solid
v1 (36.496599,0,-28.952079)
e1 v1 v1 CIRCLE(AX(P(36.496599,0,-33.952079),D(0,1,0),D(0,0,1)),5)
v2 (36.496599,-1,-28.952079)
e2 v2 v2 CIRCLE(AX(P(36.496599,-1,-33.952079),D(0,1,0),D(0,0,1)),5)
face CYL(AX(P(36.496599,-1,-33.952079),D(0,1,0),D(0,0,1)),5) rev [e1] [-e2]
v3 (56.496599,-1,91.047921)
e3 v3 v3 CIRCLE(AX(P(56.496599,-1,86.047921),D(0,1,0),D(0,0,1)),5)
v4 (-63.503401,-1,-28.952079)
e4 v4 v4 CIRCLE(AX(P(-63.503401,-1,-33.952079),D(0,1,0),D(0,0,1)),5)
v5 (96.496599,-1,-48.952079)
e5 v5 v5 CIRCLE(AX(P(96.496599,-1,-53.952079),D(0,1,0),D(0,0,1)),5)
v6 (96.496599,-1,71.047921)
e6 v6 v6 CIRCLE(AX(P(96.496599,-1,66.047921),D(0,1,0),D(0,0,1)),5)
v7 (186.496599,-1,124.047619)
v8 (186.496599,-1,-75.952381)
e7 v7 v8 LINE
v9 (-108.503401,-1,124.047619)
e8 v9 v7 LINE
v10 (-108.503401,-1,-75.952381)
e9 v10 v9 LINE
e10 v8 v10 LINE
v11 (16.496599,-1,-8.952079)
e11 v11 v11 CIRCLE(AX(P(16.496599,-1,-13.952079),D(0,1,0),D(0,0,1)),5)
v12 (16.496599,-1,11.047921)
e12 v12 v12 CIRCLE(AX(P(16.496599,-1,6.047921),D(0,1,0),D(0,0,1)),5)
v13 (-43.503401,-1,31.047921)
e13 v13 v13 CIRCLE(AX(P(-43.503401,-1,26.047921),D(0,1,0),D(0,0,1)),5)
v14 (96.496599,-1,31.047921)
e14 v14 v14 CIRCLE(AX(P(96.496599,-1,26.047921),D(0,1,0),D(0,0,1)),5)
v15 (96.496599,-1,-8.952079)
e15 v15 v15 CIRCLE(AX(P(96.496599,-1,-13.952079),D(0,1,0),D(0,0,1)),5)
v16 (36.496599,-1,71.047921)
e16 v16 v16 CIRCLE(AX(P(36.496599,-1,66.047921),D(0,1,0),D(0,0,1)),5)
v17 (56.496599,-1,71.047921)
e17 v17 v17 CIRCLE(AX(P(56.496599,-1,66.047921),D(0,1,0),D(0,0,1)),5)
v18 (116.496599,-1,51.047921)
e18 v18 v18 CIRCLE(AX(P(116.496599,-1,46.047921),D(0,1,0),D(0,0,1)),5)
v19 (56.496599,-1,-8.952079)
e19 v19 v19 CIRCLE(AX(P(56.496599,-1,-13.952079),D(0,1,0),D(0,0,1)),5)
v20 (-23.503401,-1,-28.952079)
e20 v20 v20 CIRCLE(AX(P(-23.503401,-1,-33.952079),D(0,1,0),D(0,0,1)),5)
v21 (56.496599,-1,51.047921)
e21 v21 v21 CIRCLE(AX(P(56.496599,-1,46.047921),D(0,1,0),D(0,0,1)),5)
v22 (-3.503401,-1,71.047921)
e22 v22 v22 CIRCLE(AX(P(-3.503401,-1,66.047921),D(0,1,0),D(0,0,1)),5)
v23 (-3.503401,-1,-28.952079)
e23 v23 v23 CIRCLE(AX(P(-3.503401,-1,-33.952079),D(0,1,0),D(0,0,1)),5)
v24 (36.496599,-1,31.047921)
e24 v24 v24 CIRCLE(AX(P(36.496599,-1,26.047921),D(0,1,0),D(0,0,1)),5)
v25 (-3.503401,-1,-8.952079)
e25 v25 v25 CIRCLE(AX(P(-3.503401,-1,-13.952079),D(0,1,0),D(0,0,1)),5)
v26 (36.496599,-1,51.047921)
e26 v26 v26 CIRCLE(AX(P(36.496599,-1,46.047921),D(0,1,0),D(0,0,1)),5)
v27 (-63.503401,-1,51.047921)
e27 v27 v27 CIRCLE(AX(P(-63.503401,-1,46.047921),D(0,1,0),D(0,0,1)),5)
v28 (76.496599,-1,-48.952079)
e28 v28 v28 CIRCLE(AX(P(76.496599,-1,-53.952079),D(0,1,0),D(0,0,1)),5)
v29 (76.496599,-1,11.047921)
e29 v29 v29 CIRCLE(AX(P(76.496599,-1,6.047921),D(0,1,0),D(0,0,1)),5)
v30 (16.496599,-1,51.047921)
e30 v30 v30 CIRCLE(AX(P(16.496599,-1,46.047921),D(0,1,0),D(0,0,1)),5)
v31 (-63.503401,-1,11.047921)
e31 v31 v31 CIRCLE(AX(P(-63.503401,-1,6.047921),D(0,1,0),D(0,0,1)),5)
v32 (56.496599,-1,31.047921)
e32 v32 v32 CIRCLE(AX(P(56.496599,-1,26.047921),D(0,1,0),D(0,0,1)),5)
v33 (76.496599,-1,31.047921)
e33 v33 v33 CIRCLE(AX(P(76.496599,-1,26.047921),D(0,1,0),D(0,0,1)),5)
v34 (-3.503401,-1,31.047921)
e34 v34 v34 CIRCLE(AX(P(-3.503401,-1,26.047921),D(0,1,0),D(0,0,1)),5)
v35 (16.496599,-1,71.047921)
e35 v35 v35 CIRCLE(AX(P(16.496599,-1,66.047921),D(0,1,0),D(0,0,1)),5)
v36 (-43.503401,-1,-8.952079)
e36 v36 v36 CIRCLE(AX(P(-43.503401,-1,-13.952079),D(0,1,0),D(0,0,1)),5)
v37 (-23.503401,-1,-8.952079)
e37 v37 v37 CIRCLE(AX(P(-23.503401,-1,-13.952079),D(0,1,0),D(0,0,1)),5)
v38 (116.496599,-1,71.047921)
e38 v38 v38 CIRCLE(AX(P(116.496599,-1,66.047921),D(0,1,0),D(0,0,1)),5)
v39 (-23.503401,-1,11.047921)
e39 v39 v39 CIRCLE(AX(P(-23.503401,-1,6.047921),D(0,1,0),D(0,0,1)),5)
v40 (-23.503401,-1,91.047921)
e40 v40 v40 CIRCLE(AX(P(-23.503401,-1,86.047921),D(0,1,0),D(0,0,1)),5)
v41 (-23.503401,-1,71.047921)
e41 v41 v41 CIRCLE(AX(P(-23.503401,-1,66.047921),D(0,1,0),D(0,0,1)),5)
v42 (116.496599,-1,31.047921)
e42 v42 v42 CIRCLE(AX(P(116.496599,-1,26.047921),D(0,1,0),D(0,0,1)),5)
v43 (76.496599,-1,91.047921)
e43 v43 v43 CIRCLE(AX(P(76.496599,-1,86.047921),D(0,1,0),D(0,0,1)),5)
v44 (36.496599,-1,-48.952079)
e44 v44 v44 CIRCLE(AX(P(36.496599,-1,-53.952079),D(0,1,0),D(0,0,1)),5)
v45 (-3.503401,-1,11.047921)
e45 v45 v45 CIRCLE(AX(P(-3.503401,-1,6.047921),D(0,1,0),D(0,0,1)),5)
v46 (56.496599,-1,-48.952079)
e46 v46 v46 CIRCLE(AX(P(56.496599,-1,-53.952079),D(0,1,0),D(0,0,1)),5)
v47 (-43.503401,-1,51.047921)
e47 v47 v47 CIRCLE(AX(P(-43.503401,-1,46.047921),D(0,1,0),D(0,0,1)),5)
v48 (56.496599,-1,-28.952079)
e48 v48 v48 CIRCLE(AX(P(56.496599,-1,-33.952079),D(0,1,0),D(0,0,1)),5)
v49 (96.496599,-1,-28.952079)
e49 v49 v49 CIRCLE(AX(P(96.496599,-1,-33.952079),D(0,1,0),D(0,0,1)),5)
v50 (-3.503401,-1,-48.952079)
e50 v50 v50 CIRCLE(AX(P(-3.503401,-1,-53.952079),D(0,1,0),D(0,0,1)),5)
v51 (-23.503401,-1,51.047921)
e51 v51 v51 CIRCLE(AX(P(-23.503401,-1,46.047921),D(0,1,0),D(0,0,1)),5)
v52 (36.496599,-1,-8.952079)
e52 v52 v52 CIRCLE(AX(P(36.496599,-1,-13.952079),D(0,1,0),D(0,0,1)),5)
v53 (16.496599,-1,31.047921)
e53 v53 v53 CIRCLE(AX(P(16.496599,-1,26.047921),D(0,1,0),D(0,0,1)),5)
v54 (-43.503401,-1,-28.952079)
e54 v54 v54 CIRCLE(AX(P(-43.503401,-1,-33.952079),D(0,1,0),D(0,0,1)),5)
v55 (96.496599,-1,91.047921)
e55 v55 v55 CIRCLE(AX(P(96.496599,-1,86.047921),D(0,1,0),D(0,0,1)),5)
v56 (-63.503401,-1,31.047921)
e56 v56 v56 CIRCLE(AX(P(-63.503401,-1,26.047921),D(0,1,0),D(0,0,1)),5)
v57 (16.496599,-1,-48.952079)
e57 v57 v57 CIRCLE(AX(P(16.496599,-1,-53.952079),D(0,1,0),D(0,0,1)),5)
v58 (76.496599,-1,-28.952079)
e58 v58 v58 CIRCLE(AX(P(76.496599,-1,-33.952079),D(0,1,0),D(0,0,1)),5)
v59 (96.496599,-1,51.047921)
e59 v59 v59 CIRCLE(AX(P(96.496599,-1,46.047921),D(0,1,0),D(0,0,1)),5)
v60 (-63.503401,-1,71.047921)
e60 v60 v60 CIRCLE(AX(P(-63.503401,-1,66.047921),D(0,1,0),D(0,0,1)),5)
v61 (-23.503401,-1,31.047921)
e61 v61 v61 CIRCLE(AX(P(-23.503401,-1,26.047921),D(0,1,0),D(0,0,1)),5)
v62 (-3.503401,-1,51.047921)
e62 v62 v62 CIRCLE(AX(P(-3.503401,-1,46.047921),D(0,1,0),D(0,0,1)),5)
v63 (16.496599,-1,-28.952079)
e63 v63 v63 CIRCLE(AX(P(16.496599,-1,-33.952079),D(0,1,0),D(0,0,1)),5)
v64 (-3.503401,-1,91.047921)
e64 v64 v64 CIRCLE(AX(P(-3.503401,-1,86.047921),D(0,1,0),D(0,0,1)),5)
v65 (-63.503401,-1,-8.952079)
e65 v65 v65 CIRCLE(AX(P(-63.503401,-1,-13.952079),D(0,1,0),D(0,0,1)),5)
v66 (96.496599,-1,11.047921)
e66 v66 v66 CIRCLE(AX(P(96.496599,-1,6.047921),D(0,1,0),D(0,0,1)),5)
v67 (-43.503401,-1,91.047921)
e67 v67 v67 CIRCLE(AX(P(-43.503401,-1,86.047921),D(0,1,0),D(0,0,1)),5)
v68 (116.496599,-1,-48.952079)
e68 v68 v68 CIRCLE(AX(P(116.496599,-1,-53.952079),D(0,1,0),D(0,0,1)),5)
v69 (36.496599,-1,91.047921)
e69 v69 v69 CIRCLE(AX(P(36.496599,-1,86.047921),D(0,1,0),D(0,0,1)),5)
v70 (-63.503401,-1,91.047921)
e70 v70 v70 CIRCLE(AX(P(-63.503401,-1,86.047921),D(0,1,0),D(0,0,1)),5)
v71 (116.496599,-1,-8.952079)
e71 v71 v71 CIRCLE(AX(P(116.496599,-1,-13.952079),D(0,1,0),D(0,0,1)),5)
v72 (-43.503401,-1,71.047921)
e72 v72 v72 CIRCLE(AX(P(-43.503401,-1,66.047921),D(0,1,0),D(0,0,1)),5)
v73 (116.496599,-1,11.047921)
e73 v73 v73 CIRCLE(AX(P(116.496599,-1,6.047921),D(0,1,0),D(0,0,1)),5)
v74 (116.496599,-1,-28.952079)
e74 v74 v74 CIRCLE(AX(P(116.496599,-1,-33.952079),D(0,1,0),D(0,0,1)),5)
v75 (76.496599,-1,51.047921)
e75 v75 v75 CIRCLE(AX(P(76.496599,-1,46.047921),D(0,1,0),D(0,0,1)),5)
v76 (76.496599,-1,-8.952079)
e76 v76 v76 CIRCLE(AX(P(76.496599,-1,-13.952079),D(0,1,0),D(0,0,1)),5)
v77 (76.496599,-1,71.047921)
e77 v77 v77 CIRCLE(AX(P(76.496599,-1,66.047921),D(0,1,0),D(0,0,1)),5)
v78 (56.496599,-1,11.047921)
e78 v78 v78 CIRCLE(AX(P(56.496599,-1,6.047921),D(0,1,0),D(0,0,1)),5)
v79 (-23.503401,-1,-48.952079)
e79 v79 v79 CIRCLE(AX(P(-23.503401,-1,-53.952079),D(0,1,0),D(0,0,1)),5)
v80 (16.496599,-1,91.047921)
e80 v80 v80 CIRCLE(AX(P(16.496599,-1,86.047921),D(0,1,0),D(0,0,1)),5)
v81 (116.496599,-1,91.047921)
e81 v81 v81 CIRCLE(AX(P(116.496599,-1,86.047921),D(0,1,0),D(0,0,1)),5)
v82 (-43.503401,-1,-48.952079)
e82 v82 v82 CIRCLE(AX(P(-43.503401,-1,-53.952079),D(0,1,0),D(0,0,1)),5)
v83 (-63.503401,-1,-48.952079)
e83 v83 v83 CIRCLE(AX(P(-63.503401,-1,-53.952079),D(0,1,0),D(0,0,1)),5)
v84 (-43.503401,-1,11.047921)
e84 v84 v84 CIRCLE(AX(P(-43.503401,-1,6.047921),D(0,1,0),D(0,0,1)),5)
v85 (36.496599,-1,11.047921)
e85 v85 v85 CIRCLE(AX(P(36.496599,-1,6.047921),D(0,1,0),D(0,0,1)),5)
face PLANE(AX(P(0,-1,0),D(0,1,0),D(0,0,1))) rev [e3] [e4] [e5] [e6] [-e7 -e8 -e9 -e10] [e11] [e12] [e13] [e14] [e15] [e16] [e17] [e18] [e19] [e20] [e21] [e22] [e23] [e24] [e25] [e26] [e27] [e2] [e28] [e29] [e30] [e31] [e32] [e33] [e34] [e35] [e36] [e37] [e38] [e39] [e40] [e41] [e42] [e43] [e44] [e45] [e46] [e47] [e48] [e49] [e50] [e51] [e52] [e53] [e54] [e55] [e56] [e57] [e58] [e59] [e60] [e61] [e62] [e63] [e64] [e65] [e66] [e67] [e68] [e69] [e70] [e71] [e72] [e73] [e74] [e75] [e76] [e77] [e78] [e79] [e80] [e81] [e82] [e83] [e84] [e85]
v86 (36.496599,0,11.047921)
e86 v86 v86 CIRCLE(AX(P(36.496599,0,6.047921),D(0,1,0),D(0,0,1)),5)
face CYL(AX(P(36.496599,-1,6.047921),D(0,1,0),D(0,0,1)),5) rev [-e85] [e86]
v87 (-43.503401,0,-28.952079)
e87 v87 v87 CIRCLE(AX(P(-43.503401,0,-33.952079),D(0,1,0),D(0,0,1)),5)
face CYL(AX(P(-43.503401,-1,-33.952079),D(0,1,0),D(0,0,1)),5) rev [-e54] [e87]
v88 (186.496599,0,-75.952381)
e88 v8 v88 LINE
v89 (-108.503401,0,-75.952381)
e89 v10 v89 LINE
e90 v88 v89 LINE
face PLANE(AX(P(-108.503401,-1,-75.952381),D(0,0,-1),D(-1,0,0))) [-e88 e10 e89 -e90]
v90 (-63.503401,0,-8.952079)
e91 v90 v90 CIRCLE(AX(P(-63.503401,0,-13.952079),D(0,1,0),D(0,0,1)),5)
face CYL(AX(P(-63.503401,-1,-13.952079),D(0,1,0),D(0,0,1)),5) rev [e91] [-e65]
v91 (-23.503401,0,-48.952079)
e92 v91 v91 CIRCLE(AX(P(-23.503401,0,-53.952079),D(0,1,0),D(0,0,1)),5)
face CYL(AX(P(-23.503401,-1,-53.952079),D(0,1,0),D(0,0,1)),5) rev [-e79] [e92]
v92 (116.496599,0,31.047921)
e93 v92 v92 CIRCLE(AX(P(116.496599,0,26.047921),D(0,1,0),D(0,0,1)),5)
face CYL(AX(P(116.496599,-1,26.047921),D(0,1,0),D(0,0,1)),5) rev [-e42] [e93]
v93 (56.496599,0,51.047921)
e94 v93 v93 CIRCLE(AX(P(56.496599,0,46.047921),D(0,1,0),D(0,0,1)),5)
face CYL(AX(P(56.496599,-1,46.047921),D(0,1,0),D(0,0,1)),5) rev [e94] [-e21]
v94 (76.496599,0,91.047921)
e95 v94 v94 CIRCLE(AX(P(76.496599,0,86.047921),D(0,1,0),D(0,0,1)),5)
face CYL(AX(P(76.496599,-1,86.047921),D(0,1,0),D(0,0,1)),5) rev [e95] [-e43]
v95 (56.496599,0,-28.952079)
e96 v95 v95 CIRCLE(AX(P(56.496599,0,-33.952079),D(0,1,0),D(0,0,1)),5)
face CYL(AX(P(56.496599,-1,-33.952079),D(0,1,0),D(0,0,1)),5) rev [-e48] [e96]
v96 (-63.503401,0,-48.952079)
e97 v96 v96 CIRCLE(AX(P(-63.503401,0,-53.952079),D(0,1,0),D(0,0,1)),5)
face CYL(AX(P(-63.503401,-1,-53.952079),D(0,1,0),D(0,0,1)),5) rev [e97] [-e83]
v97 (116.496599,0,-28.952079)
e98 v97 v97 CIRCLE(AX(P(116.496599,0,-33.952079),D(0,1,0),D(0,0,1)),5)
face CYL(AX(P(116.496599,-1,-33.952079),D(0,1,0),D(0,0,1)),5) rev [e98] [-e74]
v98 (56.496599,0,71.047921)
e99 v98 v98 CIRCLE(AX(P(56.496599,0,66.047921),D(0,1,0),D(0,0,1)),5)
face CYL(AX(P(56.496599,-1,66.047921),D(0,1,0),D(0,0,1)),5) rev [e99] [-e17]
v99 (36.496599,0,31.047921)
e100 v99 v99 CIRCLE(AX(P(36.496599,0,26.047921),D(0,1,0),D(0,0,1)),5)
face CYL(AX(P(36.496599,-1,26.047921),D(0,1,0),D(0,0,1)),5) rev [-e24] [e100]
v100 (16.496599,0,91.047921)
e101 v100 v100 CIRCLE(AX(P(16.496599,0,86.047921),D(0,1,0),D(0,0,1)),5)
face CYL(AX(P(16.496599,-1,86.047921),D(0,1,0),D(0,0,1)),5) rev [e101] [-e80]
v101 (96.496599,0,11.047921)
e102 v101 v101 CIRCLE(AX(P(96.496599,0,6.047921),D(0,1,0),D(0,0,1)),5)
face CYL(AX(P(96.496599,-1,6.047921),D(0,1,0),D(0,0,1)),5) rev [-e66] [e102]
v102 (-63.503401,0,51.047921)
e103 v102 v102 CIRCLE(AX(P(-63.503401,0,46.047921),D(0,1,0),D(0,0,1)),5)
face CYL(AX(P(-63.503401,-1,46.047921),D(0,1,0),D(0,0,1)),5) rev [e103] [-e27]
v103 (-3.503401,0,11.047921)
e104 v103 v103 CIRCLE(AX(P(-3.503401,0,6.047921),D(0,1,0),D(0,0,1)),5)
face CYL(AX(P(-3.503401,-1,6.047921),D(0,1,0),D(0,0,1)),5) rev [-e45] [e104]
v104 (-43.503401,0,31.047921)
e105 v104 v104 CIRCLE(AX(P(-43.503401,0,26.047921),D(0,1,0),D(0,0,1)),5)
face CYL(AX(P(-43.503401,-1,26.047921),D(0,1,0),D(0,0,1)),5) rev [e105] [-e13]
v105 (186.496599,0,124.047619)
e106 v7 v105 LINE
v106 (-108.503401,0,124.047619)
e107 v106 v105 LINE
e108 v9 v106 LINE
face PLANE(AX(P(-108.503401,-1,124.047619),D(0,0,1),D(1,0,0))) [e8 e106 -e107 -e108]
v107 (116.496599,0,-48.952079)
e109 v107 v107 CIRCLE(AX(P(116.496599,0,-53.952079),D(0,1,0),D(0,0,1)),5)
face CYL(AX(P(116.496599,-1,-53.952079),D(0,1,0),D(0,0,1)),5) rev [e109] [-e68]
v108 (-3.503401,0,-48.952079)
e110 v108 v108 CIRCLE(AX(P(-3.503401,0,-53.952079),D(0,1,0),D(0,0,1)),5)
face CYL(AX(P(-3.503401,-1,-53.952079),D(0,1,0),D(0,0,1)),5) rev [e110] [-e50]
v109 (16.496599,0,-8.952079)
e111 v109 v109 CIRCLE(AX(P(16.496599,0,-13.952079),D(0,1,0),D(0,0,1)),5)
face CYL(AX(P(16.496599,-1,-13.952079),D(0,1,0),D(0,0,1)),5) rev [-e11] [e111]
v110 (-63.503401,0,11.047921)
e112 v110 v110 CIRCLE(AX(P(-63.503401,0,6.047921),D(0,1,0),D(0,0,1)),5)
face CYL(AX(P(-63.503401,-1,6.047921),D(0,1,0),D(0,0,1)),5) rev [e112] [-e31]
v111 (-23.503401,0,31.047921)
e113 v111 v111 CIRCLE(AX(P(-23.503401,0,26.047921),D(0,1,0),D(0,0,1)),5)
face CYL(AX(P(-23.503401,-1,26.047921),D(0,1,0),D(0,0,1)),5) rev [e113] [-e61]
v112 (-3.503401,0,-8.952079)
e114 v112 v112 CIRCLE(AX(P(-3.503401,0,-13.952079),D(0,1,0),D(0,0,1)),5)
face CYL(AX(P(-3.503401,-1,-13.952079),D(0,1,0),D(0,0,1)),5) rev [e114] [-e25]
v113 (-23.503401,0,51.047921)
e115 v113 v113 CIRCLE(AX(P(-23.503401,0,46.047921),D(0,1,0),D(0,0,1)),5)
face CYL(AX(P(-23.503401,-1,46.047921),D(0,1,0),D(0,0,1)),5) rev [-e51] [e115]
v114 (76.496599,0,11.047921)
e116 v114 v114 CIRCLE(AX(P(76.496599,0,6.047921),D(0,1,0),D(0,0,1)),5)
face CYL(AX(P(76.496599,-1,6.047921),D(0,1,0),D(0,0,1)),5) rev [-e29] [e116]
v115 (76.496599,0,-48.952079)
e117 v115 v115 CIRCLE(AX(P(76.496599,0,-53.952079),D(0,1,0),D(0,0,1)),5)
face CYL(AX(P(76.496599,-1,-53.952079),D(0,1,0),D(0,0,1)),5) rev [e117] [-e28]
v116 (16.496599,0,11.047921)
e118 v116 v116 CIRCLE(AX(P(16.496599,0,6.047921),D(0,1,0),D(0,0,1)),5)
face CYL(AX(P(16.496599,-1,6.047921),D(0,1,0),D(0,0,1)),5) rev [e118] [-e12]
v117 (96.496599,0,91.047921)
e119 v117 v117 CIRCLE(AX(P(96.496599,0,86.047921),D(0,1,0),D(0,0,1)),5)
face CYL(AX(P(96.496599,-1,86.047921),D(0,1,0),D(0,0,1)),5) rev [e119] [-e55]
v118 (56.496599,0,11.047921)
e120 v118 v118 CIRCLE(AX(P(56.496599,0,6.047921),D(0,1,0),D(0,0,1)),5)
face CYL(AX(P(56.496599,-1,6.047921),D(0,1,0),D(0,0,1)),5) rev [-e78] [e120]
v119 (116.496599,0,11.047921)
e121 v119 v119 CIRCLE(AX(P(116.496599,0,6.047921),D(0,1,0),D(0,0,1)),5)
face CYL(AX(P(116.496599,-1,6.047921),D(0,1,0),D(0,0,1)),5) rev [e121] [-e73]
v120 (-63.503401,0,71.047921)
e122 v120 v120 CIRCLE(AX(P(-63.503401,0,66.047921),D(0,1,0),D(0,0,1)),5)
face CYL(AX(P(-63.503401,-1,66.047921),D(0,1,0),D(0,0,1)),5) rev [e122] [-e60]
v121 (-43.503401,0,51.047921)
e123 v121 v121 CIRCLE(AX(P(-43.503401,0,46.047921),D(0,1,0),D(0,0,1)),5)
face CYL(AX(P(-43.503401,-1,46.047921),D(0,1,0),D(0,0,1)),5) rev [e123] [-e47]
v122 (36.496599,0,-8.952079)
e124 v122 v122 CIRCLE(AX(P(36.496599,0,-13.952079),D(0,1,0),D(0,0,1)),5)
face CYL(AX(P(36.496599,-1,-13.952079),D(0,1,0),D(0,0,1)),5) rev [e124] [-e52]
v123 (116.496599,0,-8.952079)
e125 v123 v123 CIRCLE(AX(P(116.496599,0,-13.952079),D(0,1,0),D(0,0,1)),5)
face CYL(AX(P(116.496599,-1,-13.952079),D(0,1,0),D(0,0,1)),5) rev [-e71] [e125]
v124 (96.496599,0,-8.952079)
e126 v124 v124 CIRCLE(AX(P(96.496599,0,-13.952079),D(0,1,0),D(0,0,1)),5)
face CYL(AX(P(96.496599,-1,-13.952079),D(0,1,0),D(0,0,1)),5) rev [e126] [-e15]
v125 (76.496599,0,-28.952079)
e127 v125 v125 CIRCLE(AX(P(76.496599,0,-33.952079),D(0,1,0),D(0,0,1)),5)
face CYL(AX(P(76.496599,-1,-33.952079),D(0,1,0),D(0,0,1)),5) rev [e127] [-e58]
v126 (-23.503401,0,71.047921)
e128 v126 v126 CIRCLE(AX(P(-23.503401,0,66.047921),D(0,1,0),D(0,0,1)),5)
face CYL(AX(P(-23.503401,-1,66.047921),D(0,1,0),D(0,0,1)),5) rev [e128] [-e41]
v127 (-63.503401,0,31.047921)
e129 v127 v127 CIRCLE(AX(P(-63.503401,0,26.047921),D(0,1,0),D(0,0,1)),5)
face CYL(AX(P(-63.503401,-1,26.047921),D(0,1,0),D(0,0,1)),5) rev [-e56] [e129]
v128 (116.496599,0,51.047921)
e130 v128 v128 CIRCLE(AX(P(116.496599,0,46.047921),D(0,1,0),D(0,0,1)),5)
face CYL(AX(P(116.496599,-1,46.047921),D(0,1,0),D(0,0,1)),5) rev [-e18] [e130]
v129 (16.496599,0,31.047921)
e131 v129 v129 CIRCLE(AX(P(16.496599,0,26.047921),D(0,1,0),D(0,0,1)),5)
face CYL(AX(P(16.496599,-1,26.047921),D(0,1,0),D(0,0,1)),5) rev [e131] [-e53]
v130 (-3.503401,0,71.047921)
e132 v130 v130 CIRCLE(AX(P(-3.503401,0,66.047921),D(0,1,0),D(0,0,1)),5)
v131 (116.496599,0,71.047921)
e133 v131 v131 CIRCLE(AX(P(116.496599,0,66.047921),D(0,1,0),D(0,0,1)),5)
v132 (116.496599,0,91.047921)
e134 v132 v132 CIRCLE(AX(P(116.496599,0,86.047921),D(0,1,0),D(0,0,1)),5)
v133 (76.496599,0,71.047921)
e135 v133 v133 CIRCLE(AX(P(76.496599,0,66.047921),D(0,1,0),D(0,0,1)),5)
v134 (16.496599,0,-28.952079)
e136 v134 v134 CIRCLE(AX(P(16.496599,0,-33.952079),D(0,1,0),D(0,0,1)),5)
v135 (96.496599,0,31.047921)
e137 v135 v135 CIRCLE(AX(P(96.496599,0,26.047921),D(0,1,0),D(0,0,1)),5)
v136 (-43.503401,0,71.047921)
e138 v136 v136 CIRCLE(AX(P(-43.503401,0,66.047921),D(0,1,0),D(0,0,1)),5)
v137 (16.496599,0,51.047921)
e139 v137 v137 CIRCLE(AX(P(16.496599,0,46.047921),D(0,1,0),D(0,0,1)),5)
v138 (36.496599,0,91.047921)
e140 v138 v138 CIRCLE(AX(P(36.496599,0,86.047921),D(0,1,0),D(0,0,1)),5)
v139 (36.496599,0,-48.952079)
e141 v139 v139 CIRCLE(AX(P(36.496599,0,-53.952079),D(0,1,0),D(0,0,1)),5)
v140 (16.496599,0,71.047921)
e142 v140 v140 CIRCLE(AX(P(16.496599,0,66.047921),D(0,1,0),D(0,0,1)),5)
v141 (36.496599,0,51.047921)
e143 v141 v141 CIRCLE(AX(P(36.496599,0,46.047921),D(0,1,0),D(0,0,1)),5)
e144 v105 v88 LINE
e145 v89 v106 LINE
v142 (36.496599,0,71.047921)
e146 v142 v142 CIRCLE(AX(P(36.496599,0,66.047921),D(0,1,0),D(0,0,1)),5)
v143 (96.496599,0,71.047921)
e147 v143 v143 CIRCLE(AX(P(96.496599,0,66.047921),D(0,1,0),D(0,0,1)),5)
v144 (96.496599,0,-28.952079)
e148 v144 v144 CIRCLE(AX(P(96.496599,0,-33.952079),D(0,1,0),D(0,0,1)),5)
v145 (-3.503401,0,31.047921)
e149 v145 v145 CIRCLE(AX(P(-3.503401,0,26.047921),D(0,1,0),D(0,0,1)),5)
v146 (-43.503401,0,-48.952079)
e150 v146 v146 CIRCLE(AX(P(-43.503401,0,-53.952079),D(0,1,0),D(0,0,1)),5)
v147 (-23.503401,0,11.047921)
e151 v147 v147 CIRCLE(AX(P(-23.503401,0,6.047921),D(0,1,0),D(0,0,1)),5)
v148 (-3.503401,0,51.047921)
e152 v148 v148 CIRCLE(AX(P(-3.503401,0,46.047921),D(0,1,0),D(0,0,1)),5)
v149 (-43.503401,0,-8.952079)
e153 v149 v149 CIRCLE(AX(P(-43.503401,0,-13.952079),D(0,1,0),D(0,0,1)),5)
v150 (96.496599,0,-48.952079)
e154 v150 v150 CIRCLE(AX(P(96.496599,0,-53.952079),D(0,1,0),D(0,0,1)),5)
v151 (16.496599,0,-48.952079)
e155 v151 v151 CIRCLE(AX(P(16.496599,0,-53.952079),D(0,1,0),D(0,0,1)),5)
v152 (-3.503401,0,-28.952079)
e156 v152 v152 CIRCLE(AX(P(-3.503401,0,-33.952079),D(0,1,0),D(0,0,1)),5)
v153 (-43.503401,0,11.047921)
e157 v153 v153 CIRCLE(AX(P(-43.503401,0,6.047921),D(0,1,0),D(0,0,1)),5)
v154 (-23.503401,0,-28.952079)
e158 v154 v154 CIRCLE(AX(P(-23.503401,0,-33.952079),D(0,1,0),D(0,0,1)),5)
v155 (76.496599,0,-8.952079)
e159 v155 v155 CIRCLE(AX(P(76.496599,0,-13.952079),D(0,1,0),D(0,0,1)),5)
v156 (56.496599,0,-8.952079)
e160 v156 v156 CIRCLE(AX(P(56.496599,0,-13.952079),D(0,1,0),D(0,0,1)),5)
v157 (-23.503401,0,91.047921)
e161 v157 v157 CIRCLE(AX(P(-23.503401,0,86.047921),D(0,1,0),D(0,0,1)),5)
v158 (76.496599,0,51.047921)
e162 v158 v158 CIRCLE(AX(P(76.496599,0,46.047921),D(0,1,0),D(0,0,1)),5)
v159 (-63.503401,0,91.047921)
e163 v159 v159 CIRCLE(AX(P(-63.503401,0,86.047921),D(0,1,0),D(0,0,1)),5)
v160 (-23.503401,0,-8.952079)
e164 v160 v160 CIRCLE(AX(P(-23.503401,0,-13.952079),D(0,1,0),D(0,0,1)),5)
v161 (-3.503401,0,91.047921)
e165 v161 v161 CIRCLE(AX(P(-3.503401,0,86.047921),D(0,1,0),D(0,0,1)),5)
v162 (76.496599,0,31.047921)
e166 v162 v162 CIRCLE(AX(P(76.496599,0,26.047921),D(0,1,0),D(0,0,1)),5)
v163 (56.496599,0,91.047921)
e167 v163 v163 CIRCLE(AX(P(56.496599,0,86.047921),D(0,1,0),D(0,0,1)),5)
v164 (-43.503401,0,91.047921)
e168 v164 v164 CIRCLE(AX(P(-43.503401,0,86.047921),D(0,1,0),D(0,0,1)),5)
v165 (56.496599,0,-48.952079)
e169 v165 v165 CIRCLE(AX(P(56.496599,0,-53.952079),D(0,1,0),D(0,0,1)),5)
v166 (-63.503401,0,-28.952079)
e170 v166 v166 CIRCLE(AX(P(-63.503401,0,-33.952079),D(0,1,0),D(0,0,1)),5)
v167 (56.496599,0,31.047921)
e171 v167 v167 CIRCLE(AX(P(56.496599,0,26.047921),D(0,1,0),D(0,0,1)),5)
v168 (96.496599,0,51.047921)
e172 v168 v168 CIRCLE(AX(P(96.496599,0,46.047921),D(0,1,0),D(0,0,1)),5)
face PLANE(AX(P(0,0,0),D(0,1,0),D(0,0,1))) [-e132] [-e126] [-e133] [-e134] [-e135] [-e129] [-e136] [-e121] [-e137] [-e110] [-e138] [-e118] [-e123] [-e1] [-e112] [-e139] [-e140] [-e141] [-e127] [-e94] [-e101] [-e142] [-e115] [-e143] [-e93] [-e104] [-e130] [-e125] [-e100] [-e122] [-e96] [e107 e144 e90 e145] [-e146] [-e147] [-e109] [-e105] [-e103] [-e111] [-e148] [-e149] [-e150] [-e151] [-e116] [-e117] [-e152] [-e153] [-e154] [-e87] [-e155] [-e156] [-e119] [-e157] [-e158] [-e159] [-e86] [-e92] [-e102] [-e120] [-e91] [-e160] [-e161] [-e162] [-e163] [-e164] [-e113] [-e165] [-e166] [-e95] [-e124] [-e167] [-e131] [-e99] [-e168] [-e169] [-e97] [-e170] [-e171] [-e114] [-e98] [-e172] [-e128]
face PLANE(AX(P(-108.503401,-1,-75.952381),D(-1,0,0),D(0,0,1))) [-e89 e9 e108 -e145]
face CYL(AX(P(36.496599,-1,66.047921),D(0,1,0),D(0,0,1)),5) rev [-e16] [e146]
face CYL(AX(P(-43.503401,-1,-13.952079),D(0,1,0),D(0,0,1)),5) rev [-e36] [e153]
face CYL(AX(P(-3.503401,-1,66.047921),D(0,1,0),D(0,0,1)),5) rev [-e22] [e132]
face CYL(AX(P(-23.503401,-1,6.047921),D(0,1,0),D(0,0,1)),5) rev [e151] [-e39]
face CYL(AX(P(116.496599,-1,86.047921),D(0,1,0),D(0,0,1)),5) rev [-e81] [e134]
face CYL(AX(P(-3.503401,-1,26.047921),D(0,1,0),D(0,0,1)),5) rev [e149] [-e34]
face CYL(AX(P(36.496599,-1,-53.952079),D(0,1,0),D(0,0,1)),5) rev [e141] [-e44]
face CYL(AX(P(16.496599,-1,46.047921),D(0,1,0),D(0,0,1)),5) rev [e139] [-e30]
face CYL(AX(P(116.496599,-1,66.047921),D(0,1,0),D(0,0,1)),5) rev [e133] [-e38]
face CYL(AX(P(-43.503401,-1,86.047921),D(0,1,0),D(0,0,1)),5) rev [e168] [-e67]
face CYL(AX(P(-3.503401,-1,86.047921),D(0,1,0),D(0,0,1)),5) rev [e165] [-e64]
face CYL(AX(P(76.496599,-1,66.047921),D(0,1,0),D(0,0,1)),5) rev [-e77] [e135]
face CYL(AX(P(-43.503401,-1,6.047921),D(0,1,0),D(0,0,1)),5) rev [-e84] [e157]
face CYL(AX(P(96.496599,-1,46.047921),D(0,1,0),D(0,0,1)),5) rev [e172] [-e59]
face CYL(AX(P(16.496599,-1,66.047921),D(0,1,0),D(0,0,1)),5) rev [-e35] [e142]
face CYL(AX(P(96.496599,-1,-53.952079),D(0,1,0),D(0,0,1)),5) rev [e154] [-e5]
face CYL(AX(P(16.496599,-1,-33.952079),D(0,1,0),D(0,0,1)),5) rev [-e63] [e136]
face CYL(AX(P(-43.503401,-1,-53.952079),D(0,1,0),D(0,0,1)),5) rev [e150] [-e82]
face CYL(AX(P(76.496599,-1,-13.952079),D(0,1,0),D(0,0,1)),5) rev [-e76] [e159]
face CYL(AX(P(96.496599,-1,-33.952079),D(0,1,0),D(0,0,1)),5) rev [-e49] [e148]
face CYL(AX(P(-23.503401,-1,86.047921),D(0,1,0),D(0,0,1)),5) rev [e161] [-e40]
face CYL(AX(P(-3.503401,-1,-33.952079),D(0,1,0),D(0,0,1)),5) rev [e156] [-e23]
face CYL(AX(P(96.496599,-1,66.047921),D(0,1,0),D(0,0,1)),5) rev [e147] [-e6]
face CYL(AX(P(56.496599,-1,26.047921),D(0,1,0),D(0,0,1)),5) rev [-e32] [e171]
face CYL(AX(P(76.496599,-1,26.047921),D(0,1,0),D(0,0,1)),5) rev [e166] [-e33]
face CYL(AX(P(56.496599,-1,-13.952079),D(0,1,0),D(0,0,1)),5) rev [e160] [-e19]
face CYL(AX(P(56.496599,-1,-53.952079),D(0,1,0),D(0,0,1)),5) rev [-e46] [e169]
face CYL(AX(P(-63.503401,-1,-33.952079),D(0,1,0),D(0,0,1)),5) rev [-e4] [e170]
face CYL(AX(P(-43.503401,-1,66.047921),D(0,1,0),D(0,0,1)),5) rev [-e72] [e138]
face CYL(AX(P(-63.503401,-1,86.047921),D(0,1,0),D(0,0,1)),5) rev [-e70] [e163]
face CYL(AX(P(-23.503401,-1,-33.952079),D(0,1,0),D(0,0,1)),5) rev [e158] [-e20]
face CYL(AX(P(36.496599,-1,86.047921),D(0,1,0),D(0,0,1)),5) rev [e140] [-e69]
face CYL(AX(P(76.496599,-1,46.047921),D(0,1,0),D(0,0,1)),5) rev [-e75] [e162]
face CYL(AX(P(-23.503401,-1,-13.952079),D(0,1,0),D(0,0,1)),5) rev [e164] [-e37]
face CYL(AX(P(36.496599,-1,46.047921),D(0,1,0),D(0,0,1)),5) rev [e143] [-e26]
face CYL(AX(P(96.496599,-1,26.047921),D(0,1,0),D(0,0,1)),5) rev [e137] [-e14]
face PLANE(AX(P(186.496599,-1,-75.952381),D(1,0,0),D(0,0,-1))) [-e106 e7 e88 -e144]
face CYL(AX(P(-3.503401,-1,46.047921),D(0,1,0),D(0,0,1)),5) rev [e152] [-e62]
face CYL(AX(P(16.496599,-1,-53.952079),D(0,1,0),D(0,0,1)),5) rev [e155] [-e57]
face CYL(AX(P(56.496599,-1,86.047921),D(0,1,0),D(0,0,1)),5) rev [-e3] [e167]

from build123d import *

# Parameters (mm, degrees)
SKETCH1_W          = 295
SKETCH1_H          = 200
BASE_FLANGE1_DEPTH = 1
SKETCH2_R          = 5
CUT_EXTRUDE1_DEPTH = 224.986144874


# Sheet-metal steps are written as plain solids
with BuildPart() as part:
    # Sketch1 → Base-Flange1 (new body)
    with BuildSketch(Plane(origin=(0, 0, 0), x_dir=(1, 0, 0), z_dir=(0, 1, 0))):
        with Locations((38.996598639, -24.047619048)):
            Rectangle(SKETCH1_W, SKETCH1_H)
    extrude(amount=-BASE_FLANGE1_DEPTH)

    # Sketch2 → Cut-Extrude1 (cut, through all)
    with BuildSketch(Plane(origin=(0, 0, 0), x_dir=(1, 0, 0), z_dir=(0, 1, 0))):
        with Locations(Location((-63.503401361, 53.952079096, 0), (0, 0, 270))):
            Circle(SKETCH2_R)
        with Locations(Location((-63.503401361, 33.952079096, 0), (0, 0, 270))):
            Circle(SKETCH2_R)
        with Locations(Location((-63.503401361, 13.952079096, 0), (0, 0, 270))):
            Circle(SKETCH2_R)
        with Locations(Location((-63.503401361, -6.047920904, 0), (0, 0, 270))):
            Circle(SKETCH2_R)
        with Locations(Location((-63.503401361, -26.047920904, 0), (0, 0, 270))):
            Circle(SKETCH2_R)
        with Locations(Location((-63.503401361, -46.047920904, 0), (0, 0, 270))):
            Circle(SKETCH2_R)
        with Locations(Location((-63.503401361, -66.047920904, 0), (0, 0, 270))):
            Circle(SKETCH2_R)
        with Locations(Location((-63.503401361, -86.047920904, 0), (0, 0, 270))):
            Circle(SKETCH2_R)
        with Locations(Location((-43.503401361, 53.952079096, 0), (0, 0, 270))):
            Circle(SKETCH2_R)
        with Locations(Location((-43.503401361, 33.952079096, 0), (0, 0, 270))):
            Circle(SKETCH2_R)
        with Locations(Location((-43.503401361, 13.952079096, 0), (0, 0, 270))):
            Circle(SKETCH2_R)
        with Locations(Location((-43.503401361, -6.047920904, 0), (0, 0, 270))):
            Circle(SKETCH2_R)
        with Locations(Location((-43.503401361, -26.047920904, 0), (0, 0, 270))):
            Circle(SKETCH2_R)
        with Locations(Location((-43.503401361, -46.047920904, 0), (0, 0, 270))):
            Circle(SKETCH2_R)
        with Locations(Location((-43.503401361, -66.047920904, 0), (0, 0, 270))):
            Circle(SKETCH2_R)
        with Locations(Location((-43.503401361, -86.047920904, 0), (0, 0, 270))):
            Circle(SKETCH2_R)
        with Locations(Location((-23.503401361, 53.952079096, 0), (0, 0, 270))):
            Circle(SKETCH2_R)
        with Locations(Location((-23.503401361, 33.952079096, 0), (0, 0, 270))):
            Circle(SKETCH2_R)
        with Locations(Location((-23.503401361, 13.952079096, 0), (0, 0, 270))):
            Circle(SKETCH2_R)
        with Locations(Location((-23.503401361, -6.047920904, 0), (0, 0, 270))):
            Circle(SKETCH2_R)
        with Locations(Location((-23.503401361, -26.047920904, 0), (0, 0, 270))):
            Circle(SKETCH2_R)
        with Locations(Location((-23.503401361, -46.047920904, 0), (0, 0, 270))):
            Circle(SKETCH2_R)
        with Locations(Location((-23.503401361, -66.047920904, 0), (0, 0, 270))):
            Circle(SKETCH2_R)
        with Locations(Location((-23.503401361, -86.047920904, 0), (0, 0, 270))):
            Circle(SKETCH2_R)
        with Locations(Location((-3.503401361, 53.952079096, 0), (0, 0, 270))):
            Circle(SKETCH2_R)
        with Locations(Location((-3.503401361, 33.952079096, 0), (0, 0, 270))):
            Circle(SKETCH2_R)
        with Locations(Location((-3.503401361, 13.952079096, 0), (0, 0, 270))):
            Circle(SKETCH2_R)
        with Locations(Location((-3.503401361, -6.047920904, 0), (0, 0, 270))):
            Circle(SKETCH2_R)
        with Locations(Location((-3.503401361, -26.047920904, 0), (0, 0, 270))):
            Circle(SKETCH2_R)
        with Locations(Location((-3.503401361, -46.047920904, 0), (0, 0, 270))):
            Circle(SKETCH2_R)
        with Locations(Location((-3.503401361, -66.047920904, 0), (0, 0, 270))):
            Circle(SKETCH2_R)
        with Locations(Location((-3.503401361, -86.047920904, 0), (0, 0, 270))):
            Circle(SKETCH2_R)
        with Locations(Location((16.496598639, 53.952079096, 0), (0, 0, 270))):
            Circle(SKETCH2_R)
        with Locations(Location((16.496598639, 33.952079096, 0), (0, 0, 270))):
            Circle(SKETCH2_R)
        with Locations(Location((16.496598639, 13.952079096, 0), (0, 0, 270))):
            Circle(SKETCH2_R)
        with Locations(Location((16.496598639, -6.047920904, 0), (0, 0, 270))):
            Circle(SKETCH2_R)
        with Locations(Location((16.496598639, -26.047920904, 0), (0, 0, 270))):
            Circle(SKETCH2_R)
        with Locations(Location((16.496598639, -46.047920904, 0), (0, 0, 270))):
            Circle(SKETCH2_R)
        with Locations(Location((16.496598639, -66.047920904, 0), (0, 0, 270))):
            Circle(SKETCH2_R)
        with Locations(Location((16.496598639, -86.047920904, 0), (0, 0, 270))):
            Circle(SKETCH2_R)
        with Locations(Location((36.496598639, 53.952079096, 0), (0, 0, 270))):
            Circle(SKETCH2_R)
        with Locations(Location((36.496598639, 33.952079096, 0), (0, 0, 270))):
            Circle(SKETCH2_R)
        with Locations(Location((36.496598639, 13.952079096, 0), (0, 0, 270))):
            Circle(SKETCH2_R)
        with Locations(Location((36.496598639, -6.047920904, 0), (0, 0, 270))):
            Circle(SKETCH2_R)
        with Locations(Location((36.496598639, -26.047920904, 0), (0, 0, 270))):
            Circle(SKETCH2_R)
        with Locations(Location((36.496598639, -46.047920904, 0), (0, 0, 270))):
            Circle(SKETCH2_R)
        with Locations(Location((36.496598639, -66.047920904, 0), (0, 0, 270))):
            Circle(SKETCH2_R)
        with Locations(Location((36.496598639, -86.047920904, 0), (0, 0, 270))):
            Circle(SKETCH2_R)
        with Locations(Location((56.496598639, 53.952079096, 0), (0, 0, 270))):
            Circle(SKETCH2_R)
        with Locations(Location((56.496598639, 33.952079096, 0), (0, 0, 270))):
            Circle(SKETCH2_R)
        with Locations(Location((56.496598639, 13.952079096, 0), (0, 0, 270))):
            Circle(SKETCH2_R)
        with Locations(Location((56.496598639, -6.047920904, 0), (0, 0, 270))):
            Circle(SKETCH2_R)
        with Locations(Location((56.496598639, -26.047920904, 0), (0, 0, 270))):
            Circle(SKETCH2_R)
        with Locations(Location((56.496598639, -46.047920904, 0), (0, 0, 270))):
            Circle(SKETCH2_R)
        with Locations(Location((56.496598639, -66.047920904, 0), (0, 0, 270))):
            Circle(SKETCH2_R)
        with Locations(Location((56.496598639, -86.047920904, 0), (0, 0, 270))):
            Circle(SKETCH2_R)
        with Locations(Location((76.496598639, 53.952079096, 0), (0, 0, 270))):
            Circle(SKETCH2_R)
        with Locations(Location((76.496598639, 33.952079096, 0), (0, 0, 270))):
            Circle(SKETCH2_R)
        with Locations(Location((76.496598639, 13.952079096, 0), (0, 0, 270))):
            Circle(SKETCH2_R)
        with Locations(Location((76.496598639, -6.047920904, 0), (0, 0, 270))):
            Circle(SKETCH2_R)
        with Locations(Location((76.496598639, -26.047920904, 0), (0, 0, 270))):
            Circle(SKETCH2_R)
        with Locations(Location((76.496598639, -46.047920904, 0), (0, 0, 270))):
            Circle(SKETCH2_R)
        with Locations(Location((76.496598639, -66.047920904, 0), (0, 0, 270))):
            Circle(SKETCH2_R)
        with Locations(Location((76.496598639, -86.047920904, 0), (0, 0, 270))):
            Circle(SKETCH2_R)
        with Locations(Location((96.496598639, 53.952079096, 0), (0, 0, 270))):
            Circle(SKETCH2_R)
        with Locations(Location((96.496598639, 33.952079096, 0), (0, 0, 270))):
            Circle(SKETCH2_R)
        with Locations(Location((96.496598639, 13.952079096, 0), (0, 0, 270))):
            Circle(SKETCH2_R)
        with Locations(Location((96.496598639, -6.047920904, 0), (0, 0, 270))):
            Circle(SKETCH2_R)
        with Locations(Location((96.496598639, -26.047920904, 0), (0, 0, 270))):
            Circle(SKETCH2_R)
        with Locations(Location((96.496598639, -46.047920904, 0), (0, 0, 270))):
            Circle(SKETCH2_R)
        with Locations(Location((96.496598639, -66.047920904, 0), (0, 0, 270))):
            Circle(SKETCH2_R)
        with Locations(Location((96.496598639, -86.047920904, 0), (0, 0, 270))):
            Circle(SKETCH2_R)
        with Locations(Location((116.496598639, 53.952079096, 0), (0, 0, 270))):
            Circle(SKETCH2_R)
        with Locations(Location((116.496598639, 33.952079096, 0), (0, 0, 270))):
            Circle(SKETCH2_R)
        with Locations(Location((116.496598639, 13.952079096, 0), (0, 0, 270))):
            Circle(SKETCH2_R)
        with Locations(Location((116.496598639, -6.047920904, 0), (0, 0, 270))):
            Circle(SKETCH2_R)
        with Locations(Location((116.496598639, -26.047920904, 0), (0, 0, 270))):
            Circle(SKETCH2_R)
        with Locations(Location((116.496598639, -46.047920904, 0), (0, 0, 270))):
            Circle(SKETCH2_R)
        with Locations(Location((116.496598639, -66.047920904, 0), (0, 0, 270))):
            Circle(SKETCH2_R)
        with Locations(Location((116.496598639, -86.047920904, 0), (0, 0, 270))):
            Circle(SKETCH2_R)
    extrude(amount=-CUT_EXTRUDE1_DEPTH, mode=Mode.SUBTRACT)


solid = part.part
